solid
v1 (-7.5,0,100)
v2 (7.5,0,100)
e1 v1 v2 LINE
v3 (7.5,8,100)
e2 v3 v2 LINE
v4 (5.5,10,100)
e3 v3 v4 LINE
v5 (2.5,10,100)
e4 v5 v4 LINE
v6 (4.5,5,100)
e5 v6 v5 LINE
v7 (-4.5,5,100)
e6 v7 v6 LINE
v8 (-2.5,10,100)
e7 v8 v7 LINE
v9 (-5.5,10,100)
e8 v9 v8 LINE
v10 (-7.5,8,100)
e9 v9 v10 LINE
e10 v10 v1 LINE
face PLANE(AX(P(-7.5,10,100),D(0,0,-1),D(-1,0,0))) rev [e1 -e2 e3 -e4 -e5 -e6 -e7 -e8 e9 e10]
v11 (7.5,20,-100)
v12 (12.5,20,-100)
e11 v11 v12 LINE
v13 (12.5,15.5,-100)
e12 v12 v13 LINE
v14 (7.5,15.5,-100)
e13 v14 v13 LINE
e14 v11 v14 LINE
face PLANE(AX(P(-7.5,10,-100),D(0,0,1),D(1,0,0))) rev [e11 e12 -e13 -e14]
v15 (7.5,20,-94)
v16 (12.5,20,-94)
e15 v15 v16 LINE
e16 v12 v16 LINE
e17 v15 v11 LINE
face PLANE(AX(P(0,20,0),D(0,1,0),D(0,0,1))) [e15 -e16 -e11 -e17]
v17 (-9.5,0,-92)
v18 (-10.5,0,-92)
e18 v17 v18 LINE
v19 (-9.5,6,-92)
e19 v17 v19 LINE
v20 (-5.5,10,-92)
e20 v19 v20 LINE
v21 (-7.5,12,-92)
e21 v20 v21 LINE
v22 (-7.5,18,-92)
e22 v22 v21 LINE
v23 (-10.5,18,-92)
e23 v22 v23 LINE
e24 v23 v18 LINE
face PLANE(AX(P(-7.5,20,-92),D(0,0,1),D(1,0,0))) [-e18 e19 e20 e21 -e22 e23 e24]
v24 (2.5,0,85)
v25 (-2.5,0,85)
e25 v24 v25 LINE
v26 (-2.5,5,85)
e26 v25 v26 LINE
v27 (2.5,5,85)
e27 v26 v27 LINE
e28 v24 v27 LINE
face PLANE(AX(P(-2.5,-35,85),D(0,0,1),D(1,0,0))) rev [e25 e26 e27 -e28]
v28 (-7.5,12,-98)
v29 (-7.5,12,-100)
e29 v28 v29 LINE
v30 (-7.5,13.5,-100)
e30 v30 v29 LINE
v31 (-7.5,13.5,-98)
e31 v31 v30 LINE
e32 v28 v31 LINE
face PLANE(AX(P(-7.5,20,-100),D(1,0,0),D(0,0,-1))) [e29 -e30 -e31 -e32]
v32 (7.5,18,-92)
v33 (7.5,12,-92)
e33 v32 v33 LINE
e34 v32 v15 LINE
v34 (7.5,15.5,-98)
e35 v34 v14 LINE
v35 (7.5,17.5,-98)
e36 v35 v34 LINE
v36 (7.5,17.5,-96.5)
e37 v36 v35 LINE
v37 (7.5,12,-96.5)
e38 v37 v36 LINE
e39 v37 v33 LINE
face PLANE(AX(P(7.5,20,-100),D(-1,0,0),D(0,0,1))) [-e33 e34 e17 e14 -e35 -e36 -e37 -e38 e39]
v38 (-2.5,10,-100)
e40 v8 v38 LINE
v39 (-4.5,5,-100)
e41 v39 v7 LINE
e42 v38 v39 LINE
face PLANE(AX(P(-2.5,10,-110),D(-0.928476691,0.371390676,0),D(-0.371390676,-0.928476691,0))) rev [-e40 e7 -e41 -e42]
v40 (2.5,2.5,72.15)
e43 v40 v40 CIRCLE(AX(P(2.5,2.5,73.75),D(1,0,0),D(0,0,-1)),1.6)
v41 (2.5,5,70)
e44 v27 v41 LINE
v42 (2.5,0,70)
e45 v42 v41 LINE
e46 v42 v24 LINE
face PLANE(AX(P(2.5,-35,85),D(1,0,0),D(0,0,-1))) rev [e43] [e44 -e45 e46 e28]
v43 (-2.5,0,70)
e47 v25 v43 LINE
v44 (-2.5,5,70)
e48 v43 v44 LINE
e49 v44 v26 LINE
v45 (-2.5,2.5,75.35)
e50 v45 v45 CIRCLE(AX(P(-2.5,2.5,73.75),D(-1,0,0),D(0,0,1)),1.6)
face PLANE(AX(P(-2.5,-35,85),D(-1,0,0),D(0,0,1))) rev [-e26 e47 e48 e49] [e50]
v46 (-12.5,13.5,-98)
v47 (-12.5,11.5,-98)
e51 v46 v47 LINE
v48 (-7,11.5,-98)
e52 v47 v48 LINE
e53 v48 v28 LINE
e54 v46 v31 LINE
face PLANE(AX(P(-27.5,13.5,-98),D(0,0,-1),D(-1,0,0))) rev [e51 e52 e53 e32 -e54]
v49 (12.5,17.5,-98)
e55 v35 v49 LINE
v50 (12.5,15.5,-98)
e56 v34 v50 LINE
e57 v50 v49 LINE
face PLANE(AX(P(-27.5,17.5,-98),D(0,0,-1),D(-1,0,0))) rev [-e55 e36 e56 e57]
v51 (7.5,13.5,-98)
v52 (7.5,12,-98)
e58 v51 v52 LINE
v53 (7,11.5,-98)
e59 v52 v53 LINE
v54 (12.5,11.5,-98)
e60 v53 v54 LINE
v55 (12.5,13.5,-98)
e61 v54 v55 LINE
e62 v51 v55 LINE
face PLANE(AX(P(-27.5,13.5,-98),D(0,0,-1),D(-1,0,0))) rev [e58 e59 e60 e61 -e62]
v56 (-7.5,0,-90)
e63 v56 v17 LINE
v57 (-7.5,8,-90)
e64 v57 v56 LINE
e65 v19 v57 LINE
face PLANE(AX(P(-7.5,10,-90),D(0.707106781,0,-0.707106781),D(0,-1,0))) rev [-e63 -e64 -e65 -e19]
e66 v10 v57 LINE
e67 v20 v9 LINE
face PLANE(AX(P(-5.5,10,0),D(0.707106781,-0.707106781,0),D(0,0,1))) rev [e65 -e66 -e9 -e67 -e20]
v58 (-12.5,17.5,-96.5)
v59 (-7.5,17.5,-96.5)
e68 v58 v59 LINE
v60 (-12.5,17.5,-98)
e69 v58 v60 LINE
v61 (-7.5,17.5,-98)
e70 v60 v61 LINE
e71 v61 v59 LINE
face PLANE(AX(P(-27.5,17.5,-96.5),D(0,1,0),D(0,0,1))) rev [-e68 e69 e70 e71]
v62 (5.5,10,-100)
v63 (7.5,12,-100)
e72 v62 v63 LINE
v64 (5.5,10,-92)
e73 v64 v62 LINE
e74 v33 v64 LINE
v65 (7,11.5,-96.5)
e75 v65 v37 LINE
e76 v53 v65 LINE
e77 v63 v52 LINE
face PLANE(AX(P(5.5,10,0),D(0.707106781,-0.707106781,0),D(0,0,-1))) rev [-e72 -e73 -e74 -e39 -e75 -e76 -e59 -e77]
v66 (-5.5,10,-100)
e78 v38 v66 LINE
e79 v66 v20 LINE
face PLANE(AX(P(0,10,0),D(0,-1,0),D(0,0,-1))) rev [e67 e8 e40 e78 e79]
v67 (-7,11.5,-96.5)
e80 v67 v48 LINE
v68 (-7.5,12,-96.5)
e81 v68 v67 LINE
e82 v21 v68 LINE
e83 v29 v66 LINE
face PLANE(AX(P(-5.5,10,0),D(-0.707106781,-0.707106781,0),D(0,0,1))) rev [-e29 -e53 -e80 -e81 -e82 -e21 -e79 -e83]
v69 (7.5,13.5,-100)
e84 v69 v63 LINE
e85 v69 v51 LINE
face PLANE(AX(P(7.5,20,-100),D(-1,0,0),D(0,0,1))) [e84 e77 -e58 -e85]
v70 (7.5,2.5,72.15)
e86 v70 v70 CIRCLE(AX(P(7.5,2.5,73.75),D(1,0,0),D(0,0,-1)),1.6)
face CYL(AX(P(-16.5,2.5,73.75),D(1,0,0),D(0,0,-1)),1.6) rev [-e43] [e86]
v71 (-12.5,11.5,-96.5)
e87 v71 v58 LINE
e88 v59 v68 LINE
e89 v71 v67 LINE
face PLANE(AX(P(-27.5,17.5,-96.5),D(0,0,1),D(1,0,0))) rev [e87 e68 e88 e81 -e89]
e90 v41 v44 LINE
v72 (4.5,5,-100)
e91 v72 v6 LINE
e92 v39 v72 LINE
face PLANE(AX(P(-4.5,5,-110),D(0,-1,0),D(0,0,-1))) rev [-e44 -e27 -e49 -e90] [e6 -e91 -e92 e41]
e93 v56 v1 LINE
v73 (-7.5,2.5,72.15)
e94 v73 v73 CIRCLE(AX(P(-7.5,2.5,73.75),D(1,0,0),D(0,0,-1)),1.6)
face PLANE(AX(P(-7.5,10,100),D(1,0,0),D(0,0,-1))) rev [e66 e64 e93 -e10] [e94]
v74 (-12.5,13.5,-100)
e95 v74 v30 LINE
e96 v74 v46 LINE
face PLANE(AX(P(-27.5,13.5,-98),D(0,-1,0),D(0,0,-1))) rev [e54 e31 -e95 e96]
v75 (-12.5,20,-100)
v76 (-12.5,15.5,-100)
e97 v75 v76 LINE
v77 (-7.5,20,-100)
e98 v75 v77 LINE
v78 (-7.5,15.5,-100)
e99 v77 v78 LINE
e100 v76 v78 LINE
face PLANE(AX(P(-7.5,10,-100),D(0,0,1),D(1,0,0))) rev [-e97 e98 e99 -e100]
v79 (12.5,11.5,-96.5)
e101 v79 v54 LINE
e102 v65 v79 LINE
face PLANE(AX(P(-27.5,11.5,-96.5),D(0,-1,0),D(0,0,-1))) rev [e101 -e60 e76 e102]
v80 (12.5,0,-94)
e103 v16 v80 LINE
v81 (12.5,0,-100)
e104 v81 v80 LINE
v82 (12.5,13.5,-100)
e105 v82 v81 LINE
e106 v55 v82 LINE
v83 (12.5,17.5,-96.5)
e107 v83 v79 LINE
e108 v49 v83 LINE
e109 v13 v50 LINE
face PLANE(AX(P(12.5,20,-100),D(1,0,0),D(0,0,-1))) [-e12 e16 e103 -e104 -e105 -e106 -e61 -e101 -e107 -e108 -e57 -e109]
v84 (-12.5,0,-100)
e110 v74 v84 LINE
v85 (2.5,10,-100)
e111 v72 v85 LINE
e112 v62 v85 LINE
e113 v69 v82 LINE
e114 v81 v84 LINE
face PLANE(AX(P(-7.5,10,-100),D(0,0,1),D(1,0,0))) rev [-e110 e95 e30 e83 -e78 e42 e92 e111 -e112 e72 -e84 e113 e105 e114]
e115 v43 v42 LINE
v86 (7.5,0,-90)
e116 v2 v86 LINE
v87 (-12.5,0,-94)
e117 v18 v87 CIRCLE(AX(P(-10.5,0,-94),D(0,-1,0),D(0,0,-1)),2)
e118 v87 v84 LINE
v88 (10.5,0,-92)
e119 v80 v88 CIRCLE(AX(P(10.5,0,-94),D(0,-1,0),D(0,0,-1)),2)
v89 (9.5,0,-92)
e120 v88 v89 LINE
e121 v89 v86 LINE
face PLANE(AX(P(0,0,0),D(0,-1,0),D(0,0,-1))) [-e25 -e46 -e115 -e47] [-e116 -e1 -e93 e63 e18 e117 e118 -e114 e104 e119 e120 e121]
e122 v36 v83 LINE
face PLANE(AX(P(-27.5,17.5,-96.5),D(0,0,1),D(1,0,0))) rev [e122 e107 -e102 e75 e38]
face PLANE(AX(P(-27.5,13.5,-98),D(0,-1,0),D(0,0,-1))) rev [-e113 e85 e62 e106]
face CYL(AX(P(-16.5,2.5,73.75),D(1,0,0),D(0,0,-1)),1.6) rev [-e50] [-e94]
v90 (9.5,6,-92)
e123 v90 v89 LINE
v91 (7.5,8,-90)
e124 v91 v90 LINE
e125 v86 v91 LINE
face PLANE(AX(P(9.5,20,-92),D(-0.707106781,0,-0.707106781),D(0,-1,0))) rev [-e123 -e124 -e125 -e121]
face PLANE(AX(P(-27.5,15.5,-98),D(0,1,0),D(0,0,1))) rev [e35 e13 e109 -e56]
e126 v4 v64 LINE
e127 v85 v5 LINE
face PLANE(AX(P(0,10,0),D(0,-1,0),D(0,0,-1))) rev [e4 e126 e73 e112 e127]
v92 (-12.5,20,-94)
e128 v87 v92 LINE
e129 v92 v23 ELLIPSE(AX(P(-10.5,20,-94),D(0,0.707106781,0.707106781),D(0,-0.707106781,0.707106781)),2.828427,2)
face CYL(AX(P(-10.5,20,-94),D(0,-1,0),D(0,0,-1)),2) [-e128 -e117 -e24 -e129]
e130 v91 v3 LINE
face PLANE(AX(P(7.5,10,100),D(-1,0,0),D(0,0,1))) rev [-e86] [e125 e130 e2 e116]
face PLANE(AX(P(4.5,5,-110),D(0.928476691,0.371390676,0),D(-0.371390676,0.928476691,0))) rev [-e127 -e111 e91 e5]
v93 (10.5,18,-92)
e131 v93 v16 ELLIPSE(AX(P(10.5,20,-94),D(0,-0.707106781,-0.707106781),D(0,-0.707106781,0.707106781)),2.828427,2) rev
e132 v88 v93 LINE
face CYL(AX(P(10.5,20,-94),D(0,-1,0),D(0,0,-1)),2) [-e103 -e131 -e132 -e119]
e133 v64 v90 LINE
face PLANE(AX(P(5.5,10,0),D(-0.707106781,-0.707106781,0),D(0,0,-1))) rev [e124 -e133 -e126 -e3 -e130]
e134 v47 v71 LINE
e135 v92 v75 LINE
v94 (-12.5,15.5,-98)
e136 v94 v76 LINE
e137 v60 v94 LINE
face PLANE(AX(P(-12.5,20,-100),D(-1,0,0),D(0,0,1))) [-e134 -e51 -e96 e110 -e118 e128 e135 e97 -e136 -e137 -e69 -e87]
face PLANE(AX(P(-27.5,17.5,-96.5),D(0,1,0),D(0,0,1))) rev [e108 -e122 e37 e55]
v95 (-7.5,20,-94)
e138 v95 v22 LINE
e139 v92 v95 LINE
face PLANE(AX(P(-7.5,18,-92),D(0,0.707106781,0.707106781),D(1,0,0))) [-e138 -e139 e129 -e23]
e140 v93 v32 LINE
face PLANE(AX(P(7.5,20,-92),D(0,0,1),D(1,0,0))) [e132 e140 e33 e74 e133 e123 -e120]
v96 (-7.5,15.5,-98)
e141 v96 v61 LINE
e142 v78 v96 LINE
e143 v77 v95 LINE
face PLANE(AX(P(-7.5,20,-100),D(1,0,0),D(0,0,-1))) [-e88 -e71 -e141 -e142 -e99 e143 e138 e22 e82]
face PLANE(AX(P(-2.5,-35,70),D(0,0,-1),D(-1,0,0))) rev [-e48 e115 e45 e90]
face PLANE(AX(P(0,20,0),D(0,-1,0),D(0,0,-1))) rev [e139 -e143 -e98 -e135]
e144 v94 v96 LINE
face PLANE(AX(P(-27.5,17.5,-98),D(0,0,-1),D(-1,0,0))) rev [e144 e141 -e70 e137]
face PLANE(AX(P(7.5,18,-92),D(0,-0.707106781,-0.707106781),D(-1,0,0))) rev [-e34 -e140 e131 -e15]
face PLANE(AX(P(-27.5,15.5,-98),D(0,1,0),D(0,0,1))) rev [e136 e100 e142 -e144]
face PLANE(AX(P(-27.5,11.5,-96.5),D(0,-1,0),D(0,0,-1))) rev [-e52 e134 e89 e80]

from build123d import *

# Parameters (mm, degrees)
SKETCH1_W           = 15
SKETCH1_H           = 200
BOSS_EXTRUDE1_DEPTH = 10
CUT_EXTRUDE1_DEPTH  = 210
SKETCH3_W           = 5
SKETCH3_H           = 8
BOSS_EXTRUDE2_DEPTH = 20
CUT_EXTRUDE3_DEPTH  = 40
SKETCH6_W           = 5
SKETCH6_H           = 15
CUT_EXTRUDE4_DEPTH  = 40
SKETCH7_R           = 1.6
CUT_EXTRUDE5_DEPTH  = 24
CHAMFER1_SIZE       = 2
CHAMFER2_SIZE       = 2
CHAMFER3_SIZE       = 2
CHAMFER4_SIZE       = 2
FILLET1_R           = 2


with BuildPart() as part:
    # Sketch1 → Boss-Extrude1 (new body)
    with BuildSketch(Plane(origin=(0, 0, 0), x_dir=(1, 0, 0), z_dir=(0, 1, 0))):
        Rectangle(SKETCH1_W, SKETCH1_H)
    extrude(amount=BOSS_EXTRUDE1_DEPTH)

    # Sketch2 → Cut-Extrude1 (cut)
    with BuildSketch(Plane.XY.offset(100)):
        Polygon((-2.5, 10), (-4.5, 5), (4.5, 5), (2.5, 10), align=None)
    extrude(amount=-CUT_EXTRUDE1_DEPTH, mode=Mode.SUBTRACT)

    # Sketch3 → Boss-Extrude2 (add)
    with BuildSketch(Plane.XZ):
        with Locations((-10, -96)):
            Rectangle(SKETCH3_W, SKETCH3_H)
        with Locations((10, -96)):
            Rectangle(SKETCH3_W, SKETCH3_H)
    extrude(amount=-BOSS_EXTRUDE2_DEPTH)

    # Sketch4 → Cut-Extrude3 (cut)
    with BuildSketch(Plane(origin=(12.5, 0, 0), x_dir=(0, 0, -1), z_dir=(1, 0, 0))):
        Polygon((96.5, 17.5), (98, 17.5), (98, 15.5), (100, 15.5), (100, 13.5), (98, 13.5), (98, 11.5), (96.5, 11.5), align=None)
    extrude(amount=-CUT_EXTRUDE3_DEPTH, mode=Mode.SUBTRACT)

    # Sketch6 → Cut-Extrude4 (cut)
    with BuildSketch(Plane(origin=(0, 5, 0), x_dir=(1, 0, 0), z_dir=(0, 1, 0))):
        with Locations((0, -77.5)):
            Rectangle(SKETCH6_W, SKETCH6_H)
    extrude(amount=-CUT_EXTRUDE4_DEPTH, mode=Mode.SUBTRACT)

    # Sketch7 → Cut-Extrude5 (cut)
    with BuildSketch(Plane(origin=(7.5, 0, 0), x_dir=(0, 0, -1), z_dir=(1, 0, 0))):
        with Locations((-73.75, 2.5)):
            Circle(SKETCH7_R)
    extrude(amount=-CUT_EXTRUDE5_DEPTH, mode=Mode.SUBTRACT)

    # Chamfer1
    # the kernel refuses this chamfer: 2 mm, written as the material it adds along each edge
    with BuildSketch(Plane(origin=(-7.5, 10, -100), x_dir=(0.9996219169112968, -0.027495876610586487, 0), z_dir=(0, 0, 1))) as chamfer1_piece_1_section:
        Polygon((CHAMFER1_SIZE * 0.999621916911, CHAMFER1_SIZE * 0.0274958766106), (-CHAMFER1_SIZE * 0.0274958766106, CHAMFER1_SIZE * 0.999621916911), (0, 0), align=None)
    chamfer1_piece_1 = extrude(amount=8, mode=Mode.PRIVATE)
    chamfer1_piece_1 = split(chamfer1_piece_1, bisect_by=Plane(origin=(-6.8, 11.5, -99), z_dir=(0, -1, 0)), keep=Keep.TOP, mode=Mode.PRIVATE)
    add(chamfer1_piece_1)
    with BuildSketch(Plane(origin=(-7.5, 10, -100), x_dir=(0.9996219169112968, -0.027495876610586487, 0), z_dir=(0, 0, 1))) as chamfer1_piece_2_section:
        Polygon((CHAMFER1_SIZE * 0.999621916911, CHAMFER1_SIZE * 0.0274958766106), (-CHAMFER1_SIZE * 0.0274958766106, CHAMFER1_SIZE * 0.999621916911), (0, 0), align=None)
    chamfer1_piece_2 = extrude(amount=13.143365976, mode=Mode.PRIVATE)
    chamfer1_piece_2 = split(chamfer1_piece_2, bisect_by=Plane(origin=(-7.333333333, 11.666666667, -98), z_dir=(0, 0, -1)), keep=Keep.TOP, mode=Mode.PRIVATE)
    add(chamfer1_piece_2)
    with BuildSketch(Plane(origin=(-7.5, 10, -105.143365976), x_dir=(0.9996219169112968, -0.027495876610586487, 0), z_dir=(0, 0, 1))) as chamfer1_piece_3_section:
        Polygon((CHAMFER1_SIZE * 0.999621916911, CHAMFER1_SIZE * 0.0274958766106), (-CHAMFER1_SIZE * 0.0274958766106, CHAMFER1_SIZE * 0.999621916911), (0, 0), align=None)
    chamfer1_piece_3 = extrude(amount=13.143365976, mode=Mode.PRIVATE)
    chamfer1_piece_3 = split(chamfer1_piece_3, bisect_by=Plane(origin=(-7.333333333, 11.666666667, -96.5), z_dir=(0, 0, 1)), keep=Keep.TOP, mode=Mode.PRIVATE)
    add(chamfer1_piece_3)
    with BuildSketch(Plane(origin=(7.5, 10, -92), x_dir=(-0.9996219169112968, -0.027495876610586487, 0), z_dir=(0, 0, -1))) as chamfer1_piece_4_section:
        Polygon((CHAMFER1_SIZE * 0.999621916911, CHAMFER1_SIZE * 0.0274958766106), (-CHAMFER1_SIZE * 0.0274958766106, CHAMFER1_SIZE * 0.999621916911), (0, 0), align=None)
    chamfer1_piece_4 = extrude(amount=8, mode=Mode.PRIVATE)
    chamfer1_piece_4 = split(chamfer1_piece_4, bisect_by=Plane(origin=(6.8, 11.5, -94.25), z_dir=(0, -1, 0)), keep=Keep.TOP, mode=Mode.PRIVATE)
    add(chamfer1_piece_4)
    with BuildSketch(Plane(origin=(7.5, 10, -92), x_dir=(-0.9996219169112968, -0.027495876610586487, 0), z_dir=(0, 0, -1))) as chamfer1_piece_5_section:
        Polygon((CHAMFER1_SIZE * 0.999621916911, CHAMFER1_SIZE * 0.0274958766106), (-CHAMFER1_SIZE * 0.0274958766106, CHAMFER1_SIZE * 0.999621916911), (0, 0), align=None)
    chamfer1_piece_5 = extrude(amount=13.143365976, mode=Mode.PRIVATE)
    chamfer1_piece_5 = split(chamfer1_piece_5, bisect_by=Plane(origin=(7.333333333, 11.666666667, -96.5), z_dir=(0, 0, 1)), keep=Keep.TOP, mode=Mode.PRIVATE)
    add(chamfer1_piece_5)
    with BuildSketch(Plane(origin=(7.5, 10, -86.856634024), x_dir=(-0.9996219169112968, -0.027495876610586487, 0), z_dir=(0, 0, -1))) as chamfer1_piece_6_section:
        Polygon((CHAMFER1_SIZE * 0.999621916911, CHAMFER1_SIZE * 0.0274958766106), (-CHAMFER1_SIZE * 0.0274958766106, CHAMFER1_SIZE * 0.999621916911), (0, 0), align=None)
    chamfer1_piece_6 = extrude(amount=13.143365976, mode=Mode.PRIVATE)
    chamfer1_piece_6 = split(chamfer1_piece_6, bisect_by=Plane(origin=(7.333333333, 11.666666667, -98), z_dir=(0, 0, -1)), keep=Keep.TOP, mode=Mode.PRIVATE)
    add(chamfer1_piece_6)

    # Chamfer2
    chamfer2_edges = [part.edges().sort_by_distance(p)[0] for p in [
        (7.5, 10, 4),
        (-7.5, 10, 4),
    ]]
    chamfer(chamfer2_edges, length=CHAMFER2_SIZE)

    # Chamfer3
    chamfer3_edges = [part.edges().sort_by_distance(p)[0] for p in [
        (7.5, 4, -92),
        (-7.5, 4, -92),
    ]]
    chamfer(chamfer3_edges, length=CHAMFER3_SIZE)

    # Chamfer4
    chamfer4_edges = [part.edges().sort_by_distance(p)[0] for p in [
        (-10, 20, -92),
        (10, 20, -92),
    ]]
    chamfer(chamfer4_edges, length=CHAMFER4_SIZE)

    # Fillet1
    fillet1_edges = [part.edges().sort_by_distance(p)[0] for p in [
        (12.5, 9, -92),
        (-12.5, 9, -92),
    ]]
    fillet(fillet1_edges, radius=FILLET1_R)


solid = part.part
